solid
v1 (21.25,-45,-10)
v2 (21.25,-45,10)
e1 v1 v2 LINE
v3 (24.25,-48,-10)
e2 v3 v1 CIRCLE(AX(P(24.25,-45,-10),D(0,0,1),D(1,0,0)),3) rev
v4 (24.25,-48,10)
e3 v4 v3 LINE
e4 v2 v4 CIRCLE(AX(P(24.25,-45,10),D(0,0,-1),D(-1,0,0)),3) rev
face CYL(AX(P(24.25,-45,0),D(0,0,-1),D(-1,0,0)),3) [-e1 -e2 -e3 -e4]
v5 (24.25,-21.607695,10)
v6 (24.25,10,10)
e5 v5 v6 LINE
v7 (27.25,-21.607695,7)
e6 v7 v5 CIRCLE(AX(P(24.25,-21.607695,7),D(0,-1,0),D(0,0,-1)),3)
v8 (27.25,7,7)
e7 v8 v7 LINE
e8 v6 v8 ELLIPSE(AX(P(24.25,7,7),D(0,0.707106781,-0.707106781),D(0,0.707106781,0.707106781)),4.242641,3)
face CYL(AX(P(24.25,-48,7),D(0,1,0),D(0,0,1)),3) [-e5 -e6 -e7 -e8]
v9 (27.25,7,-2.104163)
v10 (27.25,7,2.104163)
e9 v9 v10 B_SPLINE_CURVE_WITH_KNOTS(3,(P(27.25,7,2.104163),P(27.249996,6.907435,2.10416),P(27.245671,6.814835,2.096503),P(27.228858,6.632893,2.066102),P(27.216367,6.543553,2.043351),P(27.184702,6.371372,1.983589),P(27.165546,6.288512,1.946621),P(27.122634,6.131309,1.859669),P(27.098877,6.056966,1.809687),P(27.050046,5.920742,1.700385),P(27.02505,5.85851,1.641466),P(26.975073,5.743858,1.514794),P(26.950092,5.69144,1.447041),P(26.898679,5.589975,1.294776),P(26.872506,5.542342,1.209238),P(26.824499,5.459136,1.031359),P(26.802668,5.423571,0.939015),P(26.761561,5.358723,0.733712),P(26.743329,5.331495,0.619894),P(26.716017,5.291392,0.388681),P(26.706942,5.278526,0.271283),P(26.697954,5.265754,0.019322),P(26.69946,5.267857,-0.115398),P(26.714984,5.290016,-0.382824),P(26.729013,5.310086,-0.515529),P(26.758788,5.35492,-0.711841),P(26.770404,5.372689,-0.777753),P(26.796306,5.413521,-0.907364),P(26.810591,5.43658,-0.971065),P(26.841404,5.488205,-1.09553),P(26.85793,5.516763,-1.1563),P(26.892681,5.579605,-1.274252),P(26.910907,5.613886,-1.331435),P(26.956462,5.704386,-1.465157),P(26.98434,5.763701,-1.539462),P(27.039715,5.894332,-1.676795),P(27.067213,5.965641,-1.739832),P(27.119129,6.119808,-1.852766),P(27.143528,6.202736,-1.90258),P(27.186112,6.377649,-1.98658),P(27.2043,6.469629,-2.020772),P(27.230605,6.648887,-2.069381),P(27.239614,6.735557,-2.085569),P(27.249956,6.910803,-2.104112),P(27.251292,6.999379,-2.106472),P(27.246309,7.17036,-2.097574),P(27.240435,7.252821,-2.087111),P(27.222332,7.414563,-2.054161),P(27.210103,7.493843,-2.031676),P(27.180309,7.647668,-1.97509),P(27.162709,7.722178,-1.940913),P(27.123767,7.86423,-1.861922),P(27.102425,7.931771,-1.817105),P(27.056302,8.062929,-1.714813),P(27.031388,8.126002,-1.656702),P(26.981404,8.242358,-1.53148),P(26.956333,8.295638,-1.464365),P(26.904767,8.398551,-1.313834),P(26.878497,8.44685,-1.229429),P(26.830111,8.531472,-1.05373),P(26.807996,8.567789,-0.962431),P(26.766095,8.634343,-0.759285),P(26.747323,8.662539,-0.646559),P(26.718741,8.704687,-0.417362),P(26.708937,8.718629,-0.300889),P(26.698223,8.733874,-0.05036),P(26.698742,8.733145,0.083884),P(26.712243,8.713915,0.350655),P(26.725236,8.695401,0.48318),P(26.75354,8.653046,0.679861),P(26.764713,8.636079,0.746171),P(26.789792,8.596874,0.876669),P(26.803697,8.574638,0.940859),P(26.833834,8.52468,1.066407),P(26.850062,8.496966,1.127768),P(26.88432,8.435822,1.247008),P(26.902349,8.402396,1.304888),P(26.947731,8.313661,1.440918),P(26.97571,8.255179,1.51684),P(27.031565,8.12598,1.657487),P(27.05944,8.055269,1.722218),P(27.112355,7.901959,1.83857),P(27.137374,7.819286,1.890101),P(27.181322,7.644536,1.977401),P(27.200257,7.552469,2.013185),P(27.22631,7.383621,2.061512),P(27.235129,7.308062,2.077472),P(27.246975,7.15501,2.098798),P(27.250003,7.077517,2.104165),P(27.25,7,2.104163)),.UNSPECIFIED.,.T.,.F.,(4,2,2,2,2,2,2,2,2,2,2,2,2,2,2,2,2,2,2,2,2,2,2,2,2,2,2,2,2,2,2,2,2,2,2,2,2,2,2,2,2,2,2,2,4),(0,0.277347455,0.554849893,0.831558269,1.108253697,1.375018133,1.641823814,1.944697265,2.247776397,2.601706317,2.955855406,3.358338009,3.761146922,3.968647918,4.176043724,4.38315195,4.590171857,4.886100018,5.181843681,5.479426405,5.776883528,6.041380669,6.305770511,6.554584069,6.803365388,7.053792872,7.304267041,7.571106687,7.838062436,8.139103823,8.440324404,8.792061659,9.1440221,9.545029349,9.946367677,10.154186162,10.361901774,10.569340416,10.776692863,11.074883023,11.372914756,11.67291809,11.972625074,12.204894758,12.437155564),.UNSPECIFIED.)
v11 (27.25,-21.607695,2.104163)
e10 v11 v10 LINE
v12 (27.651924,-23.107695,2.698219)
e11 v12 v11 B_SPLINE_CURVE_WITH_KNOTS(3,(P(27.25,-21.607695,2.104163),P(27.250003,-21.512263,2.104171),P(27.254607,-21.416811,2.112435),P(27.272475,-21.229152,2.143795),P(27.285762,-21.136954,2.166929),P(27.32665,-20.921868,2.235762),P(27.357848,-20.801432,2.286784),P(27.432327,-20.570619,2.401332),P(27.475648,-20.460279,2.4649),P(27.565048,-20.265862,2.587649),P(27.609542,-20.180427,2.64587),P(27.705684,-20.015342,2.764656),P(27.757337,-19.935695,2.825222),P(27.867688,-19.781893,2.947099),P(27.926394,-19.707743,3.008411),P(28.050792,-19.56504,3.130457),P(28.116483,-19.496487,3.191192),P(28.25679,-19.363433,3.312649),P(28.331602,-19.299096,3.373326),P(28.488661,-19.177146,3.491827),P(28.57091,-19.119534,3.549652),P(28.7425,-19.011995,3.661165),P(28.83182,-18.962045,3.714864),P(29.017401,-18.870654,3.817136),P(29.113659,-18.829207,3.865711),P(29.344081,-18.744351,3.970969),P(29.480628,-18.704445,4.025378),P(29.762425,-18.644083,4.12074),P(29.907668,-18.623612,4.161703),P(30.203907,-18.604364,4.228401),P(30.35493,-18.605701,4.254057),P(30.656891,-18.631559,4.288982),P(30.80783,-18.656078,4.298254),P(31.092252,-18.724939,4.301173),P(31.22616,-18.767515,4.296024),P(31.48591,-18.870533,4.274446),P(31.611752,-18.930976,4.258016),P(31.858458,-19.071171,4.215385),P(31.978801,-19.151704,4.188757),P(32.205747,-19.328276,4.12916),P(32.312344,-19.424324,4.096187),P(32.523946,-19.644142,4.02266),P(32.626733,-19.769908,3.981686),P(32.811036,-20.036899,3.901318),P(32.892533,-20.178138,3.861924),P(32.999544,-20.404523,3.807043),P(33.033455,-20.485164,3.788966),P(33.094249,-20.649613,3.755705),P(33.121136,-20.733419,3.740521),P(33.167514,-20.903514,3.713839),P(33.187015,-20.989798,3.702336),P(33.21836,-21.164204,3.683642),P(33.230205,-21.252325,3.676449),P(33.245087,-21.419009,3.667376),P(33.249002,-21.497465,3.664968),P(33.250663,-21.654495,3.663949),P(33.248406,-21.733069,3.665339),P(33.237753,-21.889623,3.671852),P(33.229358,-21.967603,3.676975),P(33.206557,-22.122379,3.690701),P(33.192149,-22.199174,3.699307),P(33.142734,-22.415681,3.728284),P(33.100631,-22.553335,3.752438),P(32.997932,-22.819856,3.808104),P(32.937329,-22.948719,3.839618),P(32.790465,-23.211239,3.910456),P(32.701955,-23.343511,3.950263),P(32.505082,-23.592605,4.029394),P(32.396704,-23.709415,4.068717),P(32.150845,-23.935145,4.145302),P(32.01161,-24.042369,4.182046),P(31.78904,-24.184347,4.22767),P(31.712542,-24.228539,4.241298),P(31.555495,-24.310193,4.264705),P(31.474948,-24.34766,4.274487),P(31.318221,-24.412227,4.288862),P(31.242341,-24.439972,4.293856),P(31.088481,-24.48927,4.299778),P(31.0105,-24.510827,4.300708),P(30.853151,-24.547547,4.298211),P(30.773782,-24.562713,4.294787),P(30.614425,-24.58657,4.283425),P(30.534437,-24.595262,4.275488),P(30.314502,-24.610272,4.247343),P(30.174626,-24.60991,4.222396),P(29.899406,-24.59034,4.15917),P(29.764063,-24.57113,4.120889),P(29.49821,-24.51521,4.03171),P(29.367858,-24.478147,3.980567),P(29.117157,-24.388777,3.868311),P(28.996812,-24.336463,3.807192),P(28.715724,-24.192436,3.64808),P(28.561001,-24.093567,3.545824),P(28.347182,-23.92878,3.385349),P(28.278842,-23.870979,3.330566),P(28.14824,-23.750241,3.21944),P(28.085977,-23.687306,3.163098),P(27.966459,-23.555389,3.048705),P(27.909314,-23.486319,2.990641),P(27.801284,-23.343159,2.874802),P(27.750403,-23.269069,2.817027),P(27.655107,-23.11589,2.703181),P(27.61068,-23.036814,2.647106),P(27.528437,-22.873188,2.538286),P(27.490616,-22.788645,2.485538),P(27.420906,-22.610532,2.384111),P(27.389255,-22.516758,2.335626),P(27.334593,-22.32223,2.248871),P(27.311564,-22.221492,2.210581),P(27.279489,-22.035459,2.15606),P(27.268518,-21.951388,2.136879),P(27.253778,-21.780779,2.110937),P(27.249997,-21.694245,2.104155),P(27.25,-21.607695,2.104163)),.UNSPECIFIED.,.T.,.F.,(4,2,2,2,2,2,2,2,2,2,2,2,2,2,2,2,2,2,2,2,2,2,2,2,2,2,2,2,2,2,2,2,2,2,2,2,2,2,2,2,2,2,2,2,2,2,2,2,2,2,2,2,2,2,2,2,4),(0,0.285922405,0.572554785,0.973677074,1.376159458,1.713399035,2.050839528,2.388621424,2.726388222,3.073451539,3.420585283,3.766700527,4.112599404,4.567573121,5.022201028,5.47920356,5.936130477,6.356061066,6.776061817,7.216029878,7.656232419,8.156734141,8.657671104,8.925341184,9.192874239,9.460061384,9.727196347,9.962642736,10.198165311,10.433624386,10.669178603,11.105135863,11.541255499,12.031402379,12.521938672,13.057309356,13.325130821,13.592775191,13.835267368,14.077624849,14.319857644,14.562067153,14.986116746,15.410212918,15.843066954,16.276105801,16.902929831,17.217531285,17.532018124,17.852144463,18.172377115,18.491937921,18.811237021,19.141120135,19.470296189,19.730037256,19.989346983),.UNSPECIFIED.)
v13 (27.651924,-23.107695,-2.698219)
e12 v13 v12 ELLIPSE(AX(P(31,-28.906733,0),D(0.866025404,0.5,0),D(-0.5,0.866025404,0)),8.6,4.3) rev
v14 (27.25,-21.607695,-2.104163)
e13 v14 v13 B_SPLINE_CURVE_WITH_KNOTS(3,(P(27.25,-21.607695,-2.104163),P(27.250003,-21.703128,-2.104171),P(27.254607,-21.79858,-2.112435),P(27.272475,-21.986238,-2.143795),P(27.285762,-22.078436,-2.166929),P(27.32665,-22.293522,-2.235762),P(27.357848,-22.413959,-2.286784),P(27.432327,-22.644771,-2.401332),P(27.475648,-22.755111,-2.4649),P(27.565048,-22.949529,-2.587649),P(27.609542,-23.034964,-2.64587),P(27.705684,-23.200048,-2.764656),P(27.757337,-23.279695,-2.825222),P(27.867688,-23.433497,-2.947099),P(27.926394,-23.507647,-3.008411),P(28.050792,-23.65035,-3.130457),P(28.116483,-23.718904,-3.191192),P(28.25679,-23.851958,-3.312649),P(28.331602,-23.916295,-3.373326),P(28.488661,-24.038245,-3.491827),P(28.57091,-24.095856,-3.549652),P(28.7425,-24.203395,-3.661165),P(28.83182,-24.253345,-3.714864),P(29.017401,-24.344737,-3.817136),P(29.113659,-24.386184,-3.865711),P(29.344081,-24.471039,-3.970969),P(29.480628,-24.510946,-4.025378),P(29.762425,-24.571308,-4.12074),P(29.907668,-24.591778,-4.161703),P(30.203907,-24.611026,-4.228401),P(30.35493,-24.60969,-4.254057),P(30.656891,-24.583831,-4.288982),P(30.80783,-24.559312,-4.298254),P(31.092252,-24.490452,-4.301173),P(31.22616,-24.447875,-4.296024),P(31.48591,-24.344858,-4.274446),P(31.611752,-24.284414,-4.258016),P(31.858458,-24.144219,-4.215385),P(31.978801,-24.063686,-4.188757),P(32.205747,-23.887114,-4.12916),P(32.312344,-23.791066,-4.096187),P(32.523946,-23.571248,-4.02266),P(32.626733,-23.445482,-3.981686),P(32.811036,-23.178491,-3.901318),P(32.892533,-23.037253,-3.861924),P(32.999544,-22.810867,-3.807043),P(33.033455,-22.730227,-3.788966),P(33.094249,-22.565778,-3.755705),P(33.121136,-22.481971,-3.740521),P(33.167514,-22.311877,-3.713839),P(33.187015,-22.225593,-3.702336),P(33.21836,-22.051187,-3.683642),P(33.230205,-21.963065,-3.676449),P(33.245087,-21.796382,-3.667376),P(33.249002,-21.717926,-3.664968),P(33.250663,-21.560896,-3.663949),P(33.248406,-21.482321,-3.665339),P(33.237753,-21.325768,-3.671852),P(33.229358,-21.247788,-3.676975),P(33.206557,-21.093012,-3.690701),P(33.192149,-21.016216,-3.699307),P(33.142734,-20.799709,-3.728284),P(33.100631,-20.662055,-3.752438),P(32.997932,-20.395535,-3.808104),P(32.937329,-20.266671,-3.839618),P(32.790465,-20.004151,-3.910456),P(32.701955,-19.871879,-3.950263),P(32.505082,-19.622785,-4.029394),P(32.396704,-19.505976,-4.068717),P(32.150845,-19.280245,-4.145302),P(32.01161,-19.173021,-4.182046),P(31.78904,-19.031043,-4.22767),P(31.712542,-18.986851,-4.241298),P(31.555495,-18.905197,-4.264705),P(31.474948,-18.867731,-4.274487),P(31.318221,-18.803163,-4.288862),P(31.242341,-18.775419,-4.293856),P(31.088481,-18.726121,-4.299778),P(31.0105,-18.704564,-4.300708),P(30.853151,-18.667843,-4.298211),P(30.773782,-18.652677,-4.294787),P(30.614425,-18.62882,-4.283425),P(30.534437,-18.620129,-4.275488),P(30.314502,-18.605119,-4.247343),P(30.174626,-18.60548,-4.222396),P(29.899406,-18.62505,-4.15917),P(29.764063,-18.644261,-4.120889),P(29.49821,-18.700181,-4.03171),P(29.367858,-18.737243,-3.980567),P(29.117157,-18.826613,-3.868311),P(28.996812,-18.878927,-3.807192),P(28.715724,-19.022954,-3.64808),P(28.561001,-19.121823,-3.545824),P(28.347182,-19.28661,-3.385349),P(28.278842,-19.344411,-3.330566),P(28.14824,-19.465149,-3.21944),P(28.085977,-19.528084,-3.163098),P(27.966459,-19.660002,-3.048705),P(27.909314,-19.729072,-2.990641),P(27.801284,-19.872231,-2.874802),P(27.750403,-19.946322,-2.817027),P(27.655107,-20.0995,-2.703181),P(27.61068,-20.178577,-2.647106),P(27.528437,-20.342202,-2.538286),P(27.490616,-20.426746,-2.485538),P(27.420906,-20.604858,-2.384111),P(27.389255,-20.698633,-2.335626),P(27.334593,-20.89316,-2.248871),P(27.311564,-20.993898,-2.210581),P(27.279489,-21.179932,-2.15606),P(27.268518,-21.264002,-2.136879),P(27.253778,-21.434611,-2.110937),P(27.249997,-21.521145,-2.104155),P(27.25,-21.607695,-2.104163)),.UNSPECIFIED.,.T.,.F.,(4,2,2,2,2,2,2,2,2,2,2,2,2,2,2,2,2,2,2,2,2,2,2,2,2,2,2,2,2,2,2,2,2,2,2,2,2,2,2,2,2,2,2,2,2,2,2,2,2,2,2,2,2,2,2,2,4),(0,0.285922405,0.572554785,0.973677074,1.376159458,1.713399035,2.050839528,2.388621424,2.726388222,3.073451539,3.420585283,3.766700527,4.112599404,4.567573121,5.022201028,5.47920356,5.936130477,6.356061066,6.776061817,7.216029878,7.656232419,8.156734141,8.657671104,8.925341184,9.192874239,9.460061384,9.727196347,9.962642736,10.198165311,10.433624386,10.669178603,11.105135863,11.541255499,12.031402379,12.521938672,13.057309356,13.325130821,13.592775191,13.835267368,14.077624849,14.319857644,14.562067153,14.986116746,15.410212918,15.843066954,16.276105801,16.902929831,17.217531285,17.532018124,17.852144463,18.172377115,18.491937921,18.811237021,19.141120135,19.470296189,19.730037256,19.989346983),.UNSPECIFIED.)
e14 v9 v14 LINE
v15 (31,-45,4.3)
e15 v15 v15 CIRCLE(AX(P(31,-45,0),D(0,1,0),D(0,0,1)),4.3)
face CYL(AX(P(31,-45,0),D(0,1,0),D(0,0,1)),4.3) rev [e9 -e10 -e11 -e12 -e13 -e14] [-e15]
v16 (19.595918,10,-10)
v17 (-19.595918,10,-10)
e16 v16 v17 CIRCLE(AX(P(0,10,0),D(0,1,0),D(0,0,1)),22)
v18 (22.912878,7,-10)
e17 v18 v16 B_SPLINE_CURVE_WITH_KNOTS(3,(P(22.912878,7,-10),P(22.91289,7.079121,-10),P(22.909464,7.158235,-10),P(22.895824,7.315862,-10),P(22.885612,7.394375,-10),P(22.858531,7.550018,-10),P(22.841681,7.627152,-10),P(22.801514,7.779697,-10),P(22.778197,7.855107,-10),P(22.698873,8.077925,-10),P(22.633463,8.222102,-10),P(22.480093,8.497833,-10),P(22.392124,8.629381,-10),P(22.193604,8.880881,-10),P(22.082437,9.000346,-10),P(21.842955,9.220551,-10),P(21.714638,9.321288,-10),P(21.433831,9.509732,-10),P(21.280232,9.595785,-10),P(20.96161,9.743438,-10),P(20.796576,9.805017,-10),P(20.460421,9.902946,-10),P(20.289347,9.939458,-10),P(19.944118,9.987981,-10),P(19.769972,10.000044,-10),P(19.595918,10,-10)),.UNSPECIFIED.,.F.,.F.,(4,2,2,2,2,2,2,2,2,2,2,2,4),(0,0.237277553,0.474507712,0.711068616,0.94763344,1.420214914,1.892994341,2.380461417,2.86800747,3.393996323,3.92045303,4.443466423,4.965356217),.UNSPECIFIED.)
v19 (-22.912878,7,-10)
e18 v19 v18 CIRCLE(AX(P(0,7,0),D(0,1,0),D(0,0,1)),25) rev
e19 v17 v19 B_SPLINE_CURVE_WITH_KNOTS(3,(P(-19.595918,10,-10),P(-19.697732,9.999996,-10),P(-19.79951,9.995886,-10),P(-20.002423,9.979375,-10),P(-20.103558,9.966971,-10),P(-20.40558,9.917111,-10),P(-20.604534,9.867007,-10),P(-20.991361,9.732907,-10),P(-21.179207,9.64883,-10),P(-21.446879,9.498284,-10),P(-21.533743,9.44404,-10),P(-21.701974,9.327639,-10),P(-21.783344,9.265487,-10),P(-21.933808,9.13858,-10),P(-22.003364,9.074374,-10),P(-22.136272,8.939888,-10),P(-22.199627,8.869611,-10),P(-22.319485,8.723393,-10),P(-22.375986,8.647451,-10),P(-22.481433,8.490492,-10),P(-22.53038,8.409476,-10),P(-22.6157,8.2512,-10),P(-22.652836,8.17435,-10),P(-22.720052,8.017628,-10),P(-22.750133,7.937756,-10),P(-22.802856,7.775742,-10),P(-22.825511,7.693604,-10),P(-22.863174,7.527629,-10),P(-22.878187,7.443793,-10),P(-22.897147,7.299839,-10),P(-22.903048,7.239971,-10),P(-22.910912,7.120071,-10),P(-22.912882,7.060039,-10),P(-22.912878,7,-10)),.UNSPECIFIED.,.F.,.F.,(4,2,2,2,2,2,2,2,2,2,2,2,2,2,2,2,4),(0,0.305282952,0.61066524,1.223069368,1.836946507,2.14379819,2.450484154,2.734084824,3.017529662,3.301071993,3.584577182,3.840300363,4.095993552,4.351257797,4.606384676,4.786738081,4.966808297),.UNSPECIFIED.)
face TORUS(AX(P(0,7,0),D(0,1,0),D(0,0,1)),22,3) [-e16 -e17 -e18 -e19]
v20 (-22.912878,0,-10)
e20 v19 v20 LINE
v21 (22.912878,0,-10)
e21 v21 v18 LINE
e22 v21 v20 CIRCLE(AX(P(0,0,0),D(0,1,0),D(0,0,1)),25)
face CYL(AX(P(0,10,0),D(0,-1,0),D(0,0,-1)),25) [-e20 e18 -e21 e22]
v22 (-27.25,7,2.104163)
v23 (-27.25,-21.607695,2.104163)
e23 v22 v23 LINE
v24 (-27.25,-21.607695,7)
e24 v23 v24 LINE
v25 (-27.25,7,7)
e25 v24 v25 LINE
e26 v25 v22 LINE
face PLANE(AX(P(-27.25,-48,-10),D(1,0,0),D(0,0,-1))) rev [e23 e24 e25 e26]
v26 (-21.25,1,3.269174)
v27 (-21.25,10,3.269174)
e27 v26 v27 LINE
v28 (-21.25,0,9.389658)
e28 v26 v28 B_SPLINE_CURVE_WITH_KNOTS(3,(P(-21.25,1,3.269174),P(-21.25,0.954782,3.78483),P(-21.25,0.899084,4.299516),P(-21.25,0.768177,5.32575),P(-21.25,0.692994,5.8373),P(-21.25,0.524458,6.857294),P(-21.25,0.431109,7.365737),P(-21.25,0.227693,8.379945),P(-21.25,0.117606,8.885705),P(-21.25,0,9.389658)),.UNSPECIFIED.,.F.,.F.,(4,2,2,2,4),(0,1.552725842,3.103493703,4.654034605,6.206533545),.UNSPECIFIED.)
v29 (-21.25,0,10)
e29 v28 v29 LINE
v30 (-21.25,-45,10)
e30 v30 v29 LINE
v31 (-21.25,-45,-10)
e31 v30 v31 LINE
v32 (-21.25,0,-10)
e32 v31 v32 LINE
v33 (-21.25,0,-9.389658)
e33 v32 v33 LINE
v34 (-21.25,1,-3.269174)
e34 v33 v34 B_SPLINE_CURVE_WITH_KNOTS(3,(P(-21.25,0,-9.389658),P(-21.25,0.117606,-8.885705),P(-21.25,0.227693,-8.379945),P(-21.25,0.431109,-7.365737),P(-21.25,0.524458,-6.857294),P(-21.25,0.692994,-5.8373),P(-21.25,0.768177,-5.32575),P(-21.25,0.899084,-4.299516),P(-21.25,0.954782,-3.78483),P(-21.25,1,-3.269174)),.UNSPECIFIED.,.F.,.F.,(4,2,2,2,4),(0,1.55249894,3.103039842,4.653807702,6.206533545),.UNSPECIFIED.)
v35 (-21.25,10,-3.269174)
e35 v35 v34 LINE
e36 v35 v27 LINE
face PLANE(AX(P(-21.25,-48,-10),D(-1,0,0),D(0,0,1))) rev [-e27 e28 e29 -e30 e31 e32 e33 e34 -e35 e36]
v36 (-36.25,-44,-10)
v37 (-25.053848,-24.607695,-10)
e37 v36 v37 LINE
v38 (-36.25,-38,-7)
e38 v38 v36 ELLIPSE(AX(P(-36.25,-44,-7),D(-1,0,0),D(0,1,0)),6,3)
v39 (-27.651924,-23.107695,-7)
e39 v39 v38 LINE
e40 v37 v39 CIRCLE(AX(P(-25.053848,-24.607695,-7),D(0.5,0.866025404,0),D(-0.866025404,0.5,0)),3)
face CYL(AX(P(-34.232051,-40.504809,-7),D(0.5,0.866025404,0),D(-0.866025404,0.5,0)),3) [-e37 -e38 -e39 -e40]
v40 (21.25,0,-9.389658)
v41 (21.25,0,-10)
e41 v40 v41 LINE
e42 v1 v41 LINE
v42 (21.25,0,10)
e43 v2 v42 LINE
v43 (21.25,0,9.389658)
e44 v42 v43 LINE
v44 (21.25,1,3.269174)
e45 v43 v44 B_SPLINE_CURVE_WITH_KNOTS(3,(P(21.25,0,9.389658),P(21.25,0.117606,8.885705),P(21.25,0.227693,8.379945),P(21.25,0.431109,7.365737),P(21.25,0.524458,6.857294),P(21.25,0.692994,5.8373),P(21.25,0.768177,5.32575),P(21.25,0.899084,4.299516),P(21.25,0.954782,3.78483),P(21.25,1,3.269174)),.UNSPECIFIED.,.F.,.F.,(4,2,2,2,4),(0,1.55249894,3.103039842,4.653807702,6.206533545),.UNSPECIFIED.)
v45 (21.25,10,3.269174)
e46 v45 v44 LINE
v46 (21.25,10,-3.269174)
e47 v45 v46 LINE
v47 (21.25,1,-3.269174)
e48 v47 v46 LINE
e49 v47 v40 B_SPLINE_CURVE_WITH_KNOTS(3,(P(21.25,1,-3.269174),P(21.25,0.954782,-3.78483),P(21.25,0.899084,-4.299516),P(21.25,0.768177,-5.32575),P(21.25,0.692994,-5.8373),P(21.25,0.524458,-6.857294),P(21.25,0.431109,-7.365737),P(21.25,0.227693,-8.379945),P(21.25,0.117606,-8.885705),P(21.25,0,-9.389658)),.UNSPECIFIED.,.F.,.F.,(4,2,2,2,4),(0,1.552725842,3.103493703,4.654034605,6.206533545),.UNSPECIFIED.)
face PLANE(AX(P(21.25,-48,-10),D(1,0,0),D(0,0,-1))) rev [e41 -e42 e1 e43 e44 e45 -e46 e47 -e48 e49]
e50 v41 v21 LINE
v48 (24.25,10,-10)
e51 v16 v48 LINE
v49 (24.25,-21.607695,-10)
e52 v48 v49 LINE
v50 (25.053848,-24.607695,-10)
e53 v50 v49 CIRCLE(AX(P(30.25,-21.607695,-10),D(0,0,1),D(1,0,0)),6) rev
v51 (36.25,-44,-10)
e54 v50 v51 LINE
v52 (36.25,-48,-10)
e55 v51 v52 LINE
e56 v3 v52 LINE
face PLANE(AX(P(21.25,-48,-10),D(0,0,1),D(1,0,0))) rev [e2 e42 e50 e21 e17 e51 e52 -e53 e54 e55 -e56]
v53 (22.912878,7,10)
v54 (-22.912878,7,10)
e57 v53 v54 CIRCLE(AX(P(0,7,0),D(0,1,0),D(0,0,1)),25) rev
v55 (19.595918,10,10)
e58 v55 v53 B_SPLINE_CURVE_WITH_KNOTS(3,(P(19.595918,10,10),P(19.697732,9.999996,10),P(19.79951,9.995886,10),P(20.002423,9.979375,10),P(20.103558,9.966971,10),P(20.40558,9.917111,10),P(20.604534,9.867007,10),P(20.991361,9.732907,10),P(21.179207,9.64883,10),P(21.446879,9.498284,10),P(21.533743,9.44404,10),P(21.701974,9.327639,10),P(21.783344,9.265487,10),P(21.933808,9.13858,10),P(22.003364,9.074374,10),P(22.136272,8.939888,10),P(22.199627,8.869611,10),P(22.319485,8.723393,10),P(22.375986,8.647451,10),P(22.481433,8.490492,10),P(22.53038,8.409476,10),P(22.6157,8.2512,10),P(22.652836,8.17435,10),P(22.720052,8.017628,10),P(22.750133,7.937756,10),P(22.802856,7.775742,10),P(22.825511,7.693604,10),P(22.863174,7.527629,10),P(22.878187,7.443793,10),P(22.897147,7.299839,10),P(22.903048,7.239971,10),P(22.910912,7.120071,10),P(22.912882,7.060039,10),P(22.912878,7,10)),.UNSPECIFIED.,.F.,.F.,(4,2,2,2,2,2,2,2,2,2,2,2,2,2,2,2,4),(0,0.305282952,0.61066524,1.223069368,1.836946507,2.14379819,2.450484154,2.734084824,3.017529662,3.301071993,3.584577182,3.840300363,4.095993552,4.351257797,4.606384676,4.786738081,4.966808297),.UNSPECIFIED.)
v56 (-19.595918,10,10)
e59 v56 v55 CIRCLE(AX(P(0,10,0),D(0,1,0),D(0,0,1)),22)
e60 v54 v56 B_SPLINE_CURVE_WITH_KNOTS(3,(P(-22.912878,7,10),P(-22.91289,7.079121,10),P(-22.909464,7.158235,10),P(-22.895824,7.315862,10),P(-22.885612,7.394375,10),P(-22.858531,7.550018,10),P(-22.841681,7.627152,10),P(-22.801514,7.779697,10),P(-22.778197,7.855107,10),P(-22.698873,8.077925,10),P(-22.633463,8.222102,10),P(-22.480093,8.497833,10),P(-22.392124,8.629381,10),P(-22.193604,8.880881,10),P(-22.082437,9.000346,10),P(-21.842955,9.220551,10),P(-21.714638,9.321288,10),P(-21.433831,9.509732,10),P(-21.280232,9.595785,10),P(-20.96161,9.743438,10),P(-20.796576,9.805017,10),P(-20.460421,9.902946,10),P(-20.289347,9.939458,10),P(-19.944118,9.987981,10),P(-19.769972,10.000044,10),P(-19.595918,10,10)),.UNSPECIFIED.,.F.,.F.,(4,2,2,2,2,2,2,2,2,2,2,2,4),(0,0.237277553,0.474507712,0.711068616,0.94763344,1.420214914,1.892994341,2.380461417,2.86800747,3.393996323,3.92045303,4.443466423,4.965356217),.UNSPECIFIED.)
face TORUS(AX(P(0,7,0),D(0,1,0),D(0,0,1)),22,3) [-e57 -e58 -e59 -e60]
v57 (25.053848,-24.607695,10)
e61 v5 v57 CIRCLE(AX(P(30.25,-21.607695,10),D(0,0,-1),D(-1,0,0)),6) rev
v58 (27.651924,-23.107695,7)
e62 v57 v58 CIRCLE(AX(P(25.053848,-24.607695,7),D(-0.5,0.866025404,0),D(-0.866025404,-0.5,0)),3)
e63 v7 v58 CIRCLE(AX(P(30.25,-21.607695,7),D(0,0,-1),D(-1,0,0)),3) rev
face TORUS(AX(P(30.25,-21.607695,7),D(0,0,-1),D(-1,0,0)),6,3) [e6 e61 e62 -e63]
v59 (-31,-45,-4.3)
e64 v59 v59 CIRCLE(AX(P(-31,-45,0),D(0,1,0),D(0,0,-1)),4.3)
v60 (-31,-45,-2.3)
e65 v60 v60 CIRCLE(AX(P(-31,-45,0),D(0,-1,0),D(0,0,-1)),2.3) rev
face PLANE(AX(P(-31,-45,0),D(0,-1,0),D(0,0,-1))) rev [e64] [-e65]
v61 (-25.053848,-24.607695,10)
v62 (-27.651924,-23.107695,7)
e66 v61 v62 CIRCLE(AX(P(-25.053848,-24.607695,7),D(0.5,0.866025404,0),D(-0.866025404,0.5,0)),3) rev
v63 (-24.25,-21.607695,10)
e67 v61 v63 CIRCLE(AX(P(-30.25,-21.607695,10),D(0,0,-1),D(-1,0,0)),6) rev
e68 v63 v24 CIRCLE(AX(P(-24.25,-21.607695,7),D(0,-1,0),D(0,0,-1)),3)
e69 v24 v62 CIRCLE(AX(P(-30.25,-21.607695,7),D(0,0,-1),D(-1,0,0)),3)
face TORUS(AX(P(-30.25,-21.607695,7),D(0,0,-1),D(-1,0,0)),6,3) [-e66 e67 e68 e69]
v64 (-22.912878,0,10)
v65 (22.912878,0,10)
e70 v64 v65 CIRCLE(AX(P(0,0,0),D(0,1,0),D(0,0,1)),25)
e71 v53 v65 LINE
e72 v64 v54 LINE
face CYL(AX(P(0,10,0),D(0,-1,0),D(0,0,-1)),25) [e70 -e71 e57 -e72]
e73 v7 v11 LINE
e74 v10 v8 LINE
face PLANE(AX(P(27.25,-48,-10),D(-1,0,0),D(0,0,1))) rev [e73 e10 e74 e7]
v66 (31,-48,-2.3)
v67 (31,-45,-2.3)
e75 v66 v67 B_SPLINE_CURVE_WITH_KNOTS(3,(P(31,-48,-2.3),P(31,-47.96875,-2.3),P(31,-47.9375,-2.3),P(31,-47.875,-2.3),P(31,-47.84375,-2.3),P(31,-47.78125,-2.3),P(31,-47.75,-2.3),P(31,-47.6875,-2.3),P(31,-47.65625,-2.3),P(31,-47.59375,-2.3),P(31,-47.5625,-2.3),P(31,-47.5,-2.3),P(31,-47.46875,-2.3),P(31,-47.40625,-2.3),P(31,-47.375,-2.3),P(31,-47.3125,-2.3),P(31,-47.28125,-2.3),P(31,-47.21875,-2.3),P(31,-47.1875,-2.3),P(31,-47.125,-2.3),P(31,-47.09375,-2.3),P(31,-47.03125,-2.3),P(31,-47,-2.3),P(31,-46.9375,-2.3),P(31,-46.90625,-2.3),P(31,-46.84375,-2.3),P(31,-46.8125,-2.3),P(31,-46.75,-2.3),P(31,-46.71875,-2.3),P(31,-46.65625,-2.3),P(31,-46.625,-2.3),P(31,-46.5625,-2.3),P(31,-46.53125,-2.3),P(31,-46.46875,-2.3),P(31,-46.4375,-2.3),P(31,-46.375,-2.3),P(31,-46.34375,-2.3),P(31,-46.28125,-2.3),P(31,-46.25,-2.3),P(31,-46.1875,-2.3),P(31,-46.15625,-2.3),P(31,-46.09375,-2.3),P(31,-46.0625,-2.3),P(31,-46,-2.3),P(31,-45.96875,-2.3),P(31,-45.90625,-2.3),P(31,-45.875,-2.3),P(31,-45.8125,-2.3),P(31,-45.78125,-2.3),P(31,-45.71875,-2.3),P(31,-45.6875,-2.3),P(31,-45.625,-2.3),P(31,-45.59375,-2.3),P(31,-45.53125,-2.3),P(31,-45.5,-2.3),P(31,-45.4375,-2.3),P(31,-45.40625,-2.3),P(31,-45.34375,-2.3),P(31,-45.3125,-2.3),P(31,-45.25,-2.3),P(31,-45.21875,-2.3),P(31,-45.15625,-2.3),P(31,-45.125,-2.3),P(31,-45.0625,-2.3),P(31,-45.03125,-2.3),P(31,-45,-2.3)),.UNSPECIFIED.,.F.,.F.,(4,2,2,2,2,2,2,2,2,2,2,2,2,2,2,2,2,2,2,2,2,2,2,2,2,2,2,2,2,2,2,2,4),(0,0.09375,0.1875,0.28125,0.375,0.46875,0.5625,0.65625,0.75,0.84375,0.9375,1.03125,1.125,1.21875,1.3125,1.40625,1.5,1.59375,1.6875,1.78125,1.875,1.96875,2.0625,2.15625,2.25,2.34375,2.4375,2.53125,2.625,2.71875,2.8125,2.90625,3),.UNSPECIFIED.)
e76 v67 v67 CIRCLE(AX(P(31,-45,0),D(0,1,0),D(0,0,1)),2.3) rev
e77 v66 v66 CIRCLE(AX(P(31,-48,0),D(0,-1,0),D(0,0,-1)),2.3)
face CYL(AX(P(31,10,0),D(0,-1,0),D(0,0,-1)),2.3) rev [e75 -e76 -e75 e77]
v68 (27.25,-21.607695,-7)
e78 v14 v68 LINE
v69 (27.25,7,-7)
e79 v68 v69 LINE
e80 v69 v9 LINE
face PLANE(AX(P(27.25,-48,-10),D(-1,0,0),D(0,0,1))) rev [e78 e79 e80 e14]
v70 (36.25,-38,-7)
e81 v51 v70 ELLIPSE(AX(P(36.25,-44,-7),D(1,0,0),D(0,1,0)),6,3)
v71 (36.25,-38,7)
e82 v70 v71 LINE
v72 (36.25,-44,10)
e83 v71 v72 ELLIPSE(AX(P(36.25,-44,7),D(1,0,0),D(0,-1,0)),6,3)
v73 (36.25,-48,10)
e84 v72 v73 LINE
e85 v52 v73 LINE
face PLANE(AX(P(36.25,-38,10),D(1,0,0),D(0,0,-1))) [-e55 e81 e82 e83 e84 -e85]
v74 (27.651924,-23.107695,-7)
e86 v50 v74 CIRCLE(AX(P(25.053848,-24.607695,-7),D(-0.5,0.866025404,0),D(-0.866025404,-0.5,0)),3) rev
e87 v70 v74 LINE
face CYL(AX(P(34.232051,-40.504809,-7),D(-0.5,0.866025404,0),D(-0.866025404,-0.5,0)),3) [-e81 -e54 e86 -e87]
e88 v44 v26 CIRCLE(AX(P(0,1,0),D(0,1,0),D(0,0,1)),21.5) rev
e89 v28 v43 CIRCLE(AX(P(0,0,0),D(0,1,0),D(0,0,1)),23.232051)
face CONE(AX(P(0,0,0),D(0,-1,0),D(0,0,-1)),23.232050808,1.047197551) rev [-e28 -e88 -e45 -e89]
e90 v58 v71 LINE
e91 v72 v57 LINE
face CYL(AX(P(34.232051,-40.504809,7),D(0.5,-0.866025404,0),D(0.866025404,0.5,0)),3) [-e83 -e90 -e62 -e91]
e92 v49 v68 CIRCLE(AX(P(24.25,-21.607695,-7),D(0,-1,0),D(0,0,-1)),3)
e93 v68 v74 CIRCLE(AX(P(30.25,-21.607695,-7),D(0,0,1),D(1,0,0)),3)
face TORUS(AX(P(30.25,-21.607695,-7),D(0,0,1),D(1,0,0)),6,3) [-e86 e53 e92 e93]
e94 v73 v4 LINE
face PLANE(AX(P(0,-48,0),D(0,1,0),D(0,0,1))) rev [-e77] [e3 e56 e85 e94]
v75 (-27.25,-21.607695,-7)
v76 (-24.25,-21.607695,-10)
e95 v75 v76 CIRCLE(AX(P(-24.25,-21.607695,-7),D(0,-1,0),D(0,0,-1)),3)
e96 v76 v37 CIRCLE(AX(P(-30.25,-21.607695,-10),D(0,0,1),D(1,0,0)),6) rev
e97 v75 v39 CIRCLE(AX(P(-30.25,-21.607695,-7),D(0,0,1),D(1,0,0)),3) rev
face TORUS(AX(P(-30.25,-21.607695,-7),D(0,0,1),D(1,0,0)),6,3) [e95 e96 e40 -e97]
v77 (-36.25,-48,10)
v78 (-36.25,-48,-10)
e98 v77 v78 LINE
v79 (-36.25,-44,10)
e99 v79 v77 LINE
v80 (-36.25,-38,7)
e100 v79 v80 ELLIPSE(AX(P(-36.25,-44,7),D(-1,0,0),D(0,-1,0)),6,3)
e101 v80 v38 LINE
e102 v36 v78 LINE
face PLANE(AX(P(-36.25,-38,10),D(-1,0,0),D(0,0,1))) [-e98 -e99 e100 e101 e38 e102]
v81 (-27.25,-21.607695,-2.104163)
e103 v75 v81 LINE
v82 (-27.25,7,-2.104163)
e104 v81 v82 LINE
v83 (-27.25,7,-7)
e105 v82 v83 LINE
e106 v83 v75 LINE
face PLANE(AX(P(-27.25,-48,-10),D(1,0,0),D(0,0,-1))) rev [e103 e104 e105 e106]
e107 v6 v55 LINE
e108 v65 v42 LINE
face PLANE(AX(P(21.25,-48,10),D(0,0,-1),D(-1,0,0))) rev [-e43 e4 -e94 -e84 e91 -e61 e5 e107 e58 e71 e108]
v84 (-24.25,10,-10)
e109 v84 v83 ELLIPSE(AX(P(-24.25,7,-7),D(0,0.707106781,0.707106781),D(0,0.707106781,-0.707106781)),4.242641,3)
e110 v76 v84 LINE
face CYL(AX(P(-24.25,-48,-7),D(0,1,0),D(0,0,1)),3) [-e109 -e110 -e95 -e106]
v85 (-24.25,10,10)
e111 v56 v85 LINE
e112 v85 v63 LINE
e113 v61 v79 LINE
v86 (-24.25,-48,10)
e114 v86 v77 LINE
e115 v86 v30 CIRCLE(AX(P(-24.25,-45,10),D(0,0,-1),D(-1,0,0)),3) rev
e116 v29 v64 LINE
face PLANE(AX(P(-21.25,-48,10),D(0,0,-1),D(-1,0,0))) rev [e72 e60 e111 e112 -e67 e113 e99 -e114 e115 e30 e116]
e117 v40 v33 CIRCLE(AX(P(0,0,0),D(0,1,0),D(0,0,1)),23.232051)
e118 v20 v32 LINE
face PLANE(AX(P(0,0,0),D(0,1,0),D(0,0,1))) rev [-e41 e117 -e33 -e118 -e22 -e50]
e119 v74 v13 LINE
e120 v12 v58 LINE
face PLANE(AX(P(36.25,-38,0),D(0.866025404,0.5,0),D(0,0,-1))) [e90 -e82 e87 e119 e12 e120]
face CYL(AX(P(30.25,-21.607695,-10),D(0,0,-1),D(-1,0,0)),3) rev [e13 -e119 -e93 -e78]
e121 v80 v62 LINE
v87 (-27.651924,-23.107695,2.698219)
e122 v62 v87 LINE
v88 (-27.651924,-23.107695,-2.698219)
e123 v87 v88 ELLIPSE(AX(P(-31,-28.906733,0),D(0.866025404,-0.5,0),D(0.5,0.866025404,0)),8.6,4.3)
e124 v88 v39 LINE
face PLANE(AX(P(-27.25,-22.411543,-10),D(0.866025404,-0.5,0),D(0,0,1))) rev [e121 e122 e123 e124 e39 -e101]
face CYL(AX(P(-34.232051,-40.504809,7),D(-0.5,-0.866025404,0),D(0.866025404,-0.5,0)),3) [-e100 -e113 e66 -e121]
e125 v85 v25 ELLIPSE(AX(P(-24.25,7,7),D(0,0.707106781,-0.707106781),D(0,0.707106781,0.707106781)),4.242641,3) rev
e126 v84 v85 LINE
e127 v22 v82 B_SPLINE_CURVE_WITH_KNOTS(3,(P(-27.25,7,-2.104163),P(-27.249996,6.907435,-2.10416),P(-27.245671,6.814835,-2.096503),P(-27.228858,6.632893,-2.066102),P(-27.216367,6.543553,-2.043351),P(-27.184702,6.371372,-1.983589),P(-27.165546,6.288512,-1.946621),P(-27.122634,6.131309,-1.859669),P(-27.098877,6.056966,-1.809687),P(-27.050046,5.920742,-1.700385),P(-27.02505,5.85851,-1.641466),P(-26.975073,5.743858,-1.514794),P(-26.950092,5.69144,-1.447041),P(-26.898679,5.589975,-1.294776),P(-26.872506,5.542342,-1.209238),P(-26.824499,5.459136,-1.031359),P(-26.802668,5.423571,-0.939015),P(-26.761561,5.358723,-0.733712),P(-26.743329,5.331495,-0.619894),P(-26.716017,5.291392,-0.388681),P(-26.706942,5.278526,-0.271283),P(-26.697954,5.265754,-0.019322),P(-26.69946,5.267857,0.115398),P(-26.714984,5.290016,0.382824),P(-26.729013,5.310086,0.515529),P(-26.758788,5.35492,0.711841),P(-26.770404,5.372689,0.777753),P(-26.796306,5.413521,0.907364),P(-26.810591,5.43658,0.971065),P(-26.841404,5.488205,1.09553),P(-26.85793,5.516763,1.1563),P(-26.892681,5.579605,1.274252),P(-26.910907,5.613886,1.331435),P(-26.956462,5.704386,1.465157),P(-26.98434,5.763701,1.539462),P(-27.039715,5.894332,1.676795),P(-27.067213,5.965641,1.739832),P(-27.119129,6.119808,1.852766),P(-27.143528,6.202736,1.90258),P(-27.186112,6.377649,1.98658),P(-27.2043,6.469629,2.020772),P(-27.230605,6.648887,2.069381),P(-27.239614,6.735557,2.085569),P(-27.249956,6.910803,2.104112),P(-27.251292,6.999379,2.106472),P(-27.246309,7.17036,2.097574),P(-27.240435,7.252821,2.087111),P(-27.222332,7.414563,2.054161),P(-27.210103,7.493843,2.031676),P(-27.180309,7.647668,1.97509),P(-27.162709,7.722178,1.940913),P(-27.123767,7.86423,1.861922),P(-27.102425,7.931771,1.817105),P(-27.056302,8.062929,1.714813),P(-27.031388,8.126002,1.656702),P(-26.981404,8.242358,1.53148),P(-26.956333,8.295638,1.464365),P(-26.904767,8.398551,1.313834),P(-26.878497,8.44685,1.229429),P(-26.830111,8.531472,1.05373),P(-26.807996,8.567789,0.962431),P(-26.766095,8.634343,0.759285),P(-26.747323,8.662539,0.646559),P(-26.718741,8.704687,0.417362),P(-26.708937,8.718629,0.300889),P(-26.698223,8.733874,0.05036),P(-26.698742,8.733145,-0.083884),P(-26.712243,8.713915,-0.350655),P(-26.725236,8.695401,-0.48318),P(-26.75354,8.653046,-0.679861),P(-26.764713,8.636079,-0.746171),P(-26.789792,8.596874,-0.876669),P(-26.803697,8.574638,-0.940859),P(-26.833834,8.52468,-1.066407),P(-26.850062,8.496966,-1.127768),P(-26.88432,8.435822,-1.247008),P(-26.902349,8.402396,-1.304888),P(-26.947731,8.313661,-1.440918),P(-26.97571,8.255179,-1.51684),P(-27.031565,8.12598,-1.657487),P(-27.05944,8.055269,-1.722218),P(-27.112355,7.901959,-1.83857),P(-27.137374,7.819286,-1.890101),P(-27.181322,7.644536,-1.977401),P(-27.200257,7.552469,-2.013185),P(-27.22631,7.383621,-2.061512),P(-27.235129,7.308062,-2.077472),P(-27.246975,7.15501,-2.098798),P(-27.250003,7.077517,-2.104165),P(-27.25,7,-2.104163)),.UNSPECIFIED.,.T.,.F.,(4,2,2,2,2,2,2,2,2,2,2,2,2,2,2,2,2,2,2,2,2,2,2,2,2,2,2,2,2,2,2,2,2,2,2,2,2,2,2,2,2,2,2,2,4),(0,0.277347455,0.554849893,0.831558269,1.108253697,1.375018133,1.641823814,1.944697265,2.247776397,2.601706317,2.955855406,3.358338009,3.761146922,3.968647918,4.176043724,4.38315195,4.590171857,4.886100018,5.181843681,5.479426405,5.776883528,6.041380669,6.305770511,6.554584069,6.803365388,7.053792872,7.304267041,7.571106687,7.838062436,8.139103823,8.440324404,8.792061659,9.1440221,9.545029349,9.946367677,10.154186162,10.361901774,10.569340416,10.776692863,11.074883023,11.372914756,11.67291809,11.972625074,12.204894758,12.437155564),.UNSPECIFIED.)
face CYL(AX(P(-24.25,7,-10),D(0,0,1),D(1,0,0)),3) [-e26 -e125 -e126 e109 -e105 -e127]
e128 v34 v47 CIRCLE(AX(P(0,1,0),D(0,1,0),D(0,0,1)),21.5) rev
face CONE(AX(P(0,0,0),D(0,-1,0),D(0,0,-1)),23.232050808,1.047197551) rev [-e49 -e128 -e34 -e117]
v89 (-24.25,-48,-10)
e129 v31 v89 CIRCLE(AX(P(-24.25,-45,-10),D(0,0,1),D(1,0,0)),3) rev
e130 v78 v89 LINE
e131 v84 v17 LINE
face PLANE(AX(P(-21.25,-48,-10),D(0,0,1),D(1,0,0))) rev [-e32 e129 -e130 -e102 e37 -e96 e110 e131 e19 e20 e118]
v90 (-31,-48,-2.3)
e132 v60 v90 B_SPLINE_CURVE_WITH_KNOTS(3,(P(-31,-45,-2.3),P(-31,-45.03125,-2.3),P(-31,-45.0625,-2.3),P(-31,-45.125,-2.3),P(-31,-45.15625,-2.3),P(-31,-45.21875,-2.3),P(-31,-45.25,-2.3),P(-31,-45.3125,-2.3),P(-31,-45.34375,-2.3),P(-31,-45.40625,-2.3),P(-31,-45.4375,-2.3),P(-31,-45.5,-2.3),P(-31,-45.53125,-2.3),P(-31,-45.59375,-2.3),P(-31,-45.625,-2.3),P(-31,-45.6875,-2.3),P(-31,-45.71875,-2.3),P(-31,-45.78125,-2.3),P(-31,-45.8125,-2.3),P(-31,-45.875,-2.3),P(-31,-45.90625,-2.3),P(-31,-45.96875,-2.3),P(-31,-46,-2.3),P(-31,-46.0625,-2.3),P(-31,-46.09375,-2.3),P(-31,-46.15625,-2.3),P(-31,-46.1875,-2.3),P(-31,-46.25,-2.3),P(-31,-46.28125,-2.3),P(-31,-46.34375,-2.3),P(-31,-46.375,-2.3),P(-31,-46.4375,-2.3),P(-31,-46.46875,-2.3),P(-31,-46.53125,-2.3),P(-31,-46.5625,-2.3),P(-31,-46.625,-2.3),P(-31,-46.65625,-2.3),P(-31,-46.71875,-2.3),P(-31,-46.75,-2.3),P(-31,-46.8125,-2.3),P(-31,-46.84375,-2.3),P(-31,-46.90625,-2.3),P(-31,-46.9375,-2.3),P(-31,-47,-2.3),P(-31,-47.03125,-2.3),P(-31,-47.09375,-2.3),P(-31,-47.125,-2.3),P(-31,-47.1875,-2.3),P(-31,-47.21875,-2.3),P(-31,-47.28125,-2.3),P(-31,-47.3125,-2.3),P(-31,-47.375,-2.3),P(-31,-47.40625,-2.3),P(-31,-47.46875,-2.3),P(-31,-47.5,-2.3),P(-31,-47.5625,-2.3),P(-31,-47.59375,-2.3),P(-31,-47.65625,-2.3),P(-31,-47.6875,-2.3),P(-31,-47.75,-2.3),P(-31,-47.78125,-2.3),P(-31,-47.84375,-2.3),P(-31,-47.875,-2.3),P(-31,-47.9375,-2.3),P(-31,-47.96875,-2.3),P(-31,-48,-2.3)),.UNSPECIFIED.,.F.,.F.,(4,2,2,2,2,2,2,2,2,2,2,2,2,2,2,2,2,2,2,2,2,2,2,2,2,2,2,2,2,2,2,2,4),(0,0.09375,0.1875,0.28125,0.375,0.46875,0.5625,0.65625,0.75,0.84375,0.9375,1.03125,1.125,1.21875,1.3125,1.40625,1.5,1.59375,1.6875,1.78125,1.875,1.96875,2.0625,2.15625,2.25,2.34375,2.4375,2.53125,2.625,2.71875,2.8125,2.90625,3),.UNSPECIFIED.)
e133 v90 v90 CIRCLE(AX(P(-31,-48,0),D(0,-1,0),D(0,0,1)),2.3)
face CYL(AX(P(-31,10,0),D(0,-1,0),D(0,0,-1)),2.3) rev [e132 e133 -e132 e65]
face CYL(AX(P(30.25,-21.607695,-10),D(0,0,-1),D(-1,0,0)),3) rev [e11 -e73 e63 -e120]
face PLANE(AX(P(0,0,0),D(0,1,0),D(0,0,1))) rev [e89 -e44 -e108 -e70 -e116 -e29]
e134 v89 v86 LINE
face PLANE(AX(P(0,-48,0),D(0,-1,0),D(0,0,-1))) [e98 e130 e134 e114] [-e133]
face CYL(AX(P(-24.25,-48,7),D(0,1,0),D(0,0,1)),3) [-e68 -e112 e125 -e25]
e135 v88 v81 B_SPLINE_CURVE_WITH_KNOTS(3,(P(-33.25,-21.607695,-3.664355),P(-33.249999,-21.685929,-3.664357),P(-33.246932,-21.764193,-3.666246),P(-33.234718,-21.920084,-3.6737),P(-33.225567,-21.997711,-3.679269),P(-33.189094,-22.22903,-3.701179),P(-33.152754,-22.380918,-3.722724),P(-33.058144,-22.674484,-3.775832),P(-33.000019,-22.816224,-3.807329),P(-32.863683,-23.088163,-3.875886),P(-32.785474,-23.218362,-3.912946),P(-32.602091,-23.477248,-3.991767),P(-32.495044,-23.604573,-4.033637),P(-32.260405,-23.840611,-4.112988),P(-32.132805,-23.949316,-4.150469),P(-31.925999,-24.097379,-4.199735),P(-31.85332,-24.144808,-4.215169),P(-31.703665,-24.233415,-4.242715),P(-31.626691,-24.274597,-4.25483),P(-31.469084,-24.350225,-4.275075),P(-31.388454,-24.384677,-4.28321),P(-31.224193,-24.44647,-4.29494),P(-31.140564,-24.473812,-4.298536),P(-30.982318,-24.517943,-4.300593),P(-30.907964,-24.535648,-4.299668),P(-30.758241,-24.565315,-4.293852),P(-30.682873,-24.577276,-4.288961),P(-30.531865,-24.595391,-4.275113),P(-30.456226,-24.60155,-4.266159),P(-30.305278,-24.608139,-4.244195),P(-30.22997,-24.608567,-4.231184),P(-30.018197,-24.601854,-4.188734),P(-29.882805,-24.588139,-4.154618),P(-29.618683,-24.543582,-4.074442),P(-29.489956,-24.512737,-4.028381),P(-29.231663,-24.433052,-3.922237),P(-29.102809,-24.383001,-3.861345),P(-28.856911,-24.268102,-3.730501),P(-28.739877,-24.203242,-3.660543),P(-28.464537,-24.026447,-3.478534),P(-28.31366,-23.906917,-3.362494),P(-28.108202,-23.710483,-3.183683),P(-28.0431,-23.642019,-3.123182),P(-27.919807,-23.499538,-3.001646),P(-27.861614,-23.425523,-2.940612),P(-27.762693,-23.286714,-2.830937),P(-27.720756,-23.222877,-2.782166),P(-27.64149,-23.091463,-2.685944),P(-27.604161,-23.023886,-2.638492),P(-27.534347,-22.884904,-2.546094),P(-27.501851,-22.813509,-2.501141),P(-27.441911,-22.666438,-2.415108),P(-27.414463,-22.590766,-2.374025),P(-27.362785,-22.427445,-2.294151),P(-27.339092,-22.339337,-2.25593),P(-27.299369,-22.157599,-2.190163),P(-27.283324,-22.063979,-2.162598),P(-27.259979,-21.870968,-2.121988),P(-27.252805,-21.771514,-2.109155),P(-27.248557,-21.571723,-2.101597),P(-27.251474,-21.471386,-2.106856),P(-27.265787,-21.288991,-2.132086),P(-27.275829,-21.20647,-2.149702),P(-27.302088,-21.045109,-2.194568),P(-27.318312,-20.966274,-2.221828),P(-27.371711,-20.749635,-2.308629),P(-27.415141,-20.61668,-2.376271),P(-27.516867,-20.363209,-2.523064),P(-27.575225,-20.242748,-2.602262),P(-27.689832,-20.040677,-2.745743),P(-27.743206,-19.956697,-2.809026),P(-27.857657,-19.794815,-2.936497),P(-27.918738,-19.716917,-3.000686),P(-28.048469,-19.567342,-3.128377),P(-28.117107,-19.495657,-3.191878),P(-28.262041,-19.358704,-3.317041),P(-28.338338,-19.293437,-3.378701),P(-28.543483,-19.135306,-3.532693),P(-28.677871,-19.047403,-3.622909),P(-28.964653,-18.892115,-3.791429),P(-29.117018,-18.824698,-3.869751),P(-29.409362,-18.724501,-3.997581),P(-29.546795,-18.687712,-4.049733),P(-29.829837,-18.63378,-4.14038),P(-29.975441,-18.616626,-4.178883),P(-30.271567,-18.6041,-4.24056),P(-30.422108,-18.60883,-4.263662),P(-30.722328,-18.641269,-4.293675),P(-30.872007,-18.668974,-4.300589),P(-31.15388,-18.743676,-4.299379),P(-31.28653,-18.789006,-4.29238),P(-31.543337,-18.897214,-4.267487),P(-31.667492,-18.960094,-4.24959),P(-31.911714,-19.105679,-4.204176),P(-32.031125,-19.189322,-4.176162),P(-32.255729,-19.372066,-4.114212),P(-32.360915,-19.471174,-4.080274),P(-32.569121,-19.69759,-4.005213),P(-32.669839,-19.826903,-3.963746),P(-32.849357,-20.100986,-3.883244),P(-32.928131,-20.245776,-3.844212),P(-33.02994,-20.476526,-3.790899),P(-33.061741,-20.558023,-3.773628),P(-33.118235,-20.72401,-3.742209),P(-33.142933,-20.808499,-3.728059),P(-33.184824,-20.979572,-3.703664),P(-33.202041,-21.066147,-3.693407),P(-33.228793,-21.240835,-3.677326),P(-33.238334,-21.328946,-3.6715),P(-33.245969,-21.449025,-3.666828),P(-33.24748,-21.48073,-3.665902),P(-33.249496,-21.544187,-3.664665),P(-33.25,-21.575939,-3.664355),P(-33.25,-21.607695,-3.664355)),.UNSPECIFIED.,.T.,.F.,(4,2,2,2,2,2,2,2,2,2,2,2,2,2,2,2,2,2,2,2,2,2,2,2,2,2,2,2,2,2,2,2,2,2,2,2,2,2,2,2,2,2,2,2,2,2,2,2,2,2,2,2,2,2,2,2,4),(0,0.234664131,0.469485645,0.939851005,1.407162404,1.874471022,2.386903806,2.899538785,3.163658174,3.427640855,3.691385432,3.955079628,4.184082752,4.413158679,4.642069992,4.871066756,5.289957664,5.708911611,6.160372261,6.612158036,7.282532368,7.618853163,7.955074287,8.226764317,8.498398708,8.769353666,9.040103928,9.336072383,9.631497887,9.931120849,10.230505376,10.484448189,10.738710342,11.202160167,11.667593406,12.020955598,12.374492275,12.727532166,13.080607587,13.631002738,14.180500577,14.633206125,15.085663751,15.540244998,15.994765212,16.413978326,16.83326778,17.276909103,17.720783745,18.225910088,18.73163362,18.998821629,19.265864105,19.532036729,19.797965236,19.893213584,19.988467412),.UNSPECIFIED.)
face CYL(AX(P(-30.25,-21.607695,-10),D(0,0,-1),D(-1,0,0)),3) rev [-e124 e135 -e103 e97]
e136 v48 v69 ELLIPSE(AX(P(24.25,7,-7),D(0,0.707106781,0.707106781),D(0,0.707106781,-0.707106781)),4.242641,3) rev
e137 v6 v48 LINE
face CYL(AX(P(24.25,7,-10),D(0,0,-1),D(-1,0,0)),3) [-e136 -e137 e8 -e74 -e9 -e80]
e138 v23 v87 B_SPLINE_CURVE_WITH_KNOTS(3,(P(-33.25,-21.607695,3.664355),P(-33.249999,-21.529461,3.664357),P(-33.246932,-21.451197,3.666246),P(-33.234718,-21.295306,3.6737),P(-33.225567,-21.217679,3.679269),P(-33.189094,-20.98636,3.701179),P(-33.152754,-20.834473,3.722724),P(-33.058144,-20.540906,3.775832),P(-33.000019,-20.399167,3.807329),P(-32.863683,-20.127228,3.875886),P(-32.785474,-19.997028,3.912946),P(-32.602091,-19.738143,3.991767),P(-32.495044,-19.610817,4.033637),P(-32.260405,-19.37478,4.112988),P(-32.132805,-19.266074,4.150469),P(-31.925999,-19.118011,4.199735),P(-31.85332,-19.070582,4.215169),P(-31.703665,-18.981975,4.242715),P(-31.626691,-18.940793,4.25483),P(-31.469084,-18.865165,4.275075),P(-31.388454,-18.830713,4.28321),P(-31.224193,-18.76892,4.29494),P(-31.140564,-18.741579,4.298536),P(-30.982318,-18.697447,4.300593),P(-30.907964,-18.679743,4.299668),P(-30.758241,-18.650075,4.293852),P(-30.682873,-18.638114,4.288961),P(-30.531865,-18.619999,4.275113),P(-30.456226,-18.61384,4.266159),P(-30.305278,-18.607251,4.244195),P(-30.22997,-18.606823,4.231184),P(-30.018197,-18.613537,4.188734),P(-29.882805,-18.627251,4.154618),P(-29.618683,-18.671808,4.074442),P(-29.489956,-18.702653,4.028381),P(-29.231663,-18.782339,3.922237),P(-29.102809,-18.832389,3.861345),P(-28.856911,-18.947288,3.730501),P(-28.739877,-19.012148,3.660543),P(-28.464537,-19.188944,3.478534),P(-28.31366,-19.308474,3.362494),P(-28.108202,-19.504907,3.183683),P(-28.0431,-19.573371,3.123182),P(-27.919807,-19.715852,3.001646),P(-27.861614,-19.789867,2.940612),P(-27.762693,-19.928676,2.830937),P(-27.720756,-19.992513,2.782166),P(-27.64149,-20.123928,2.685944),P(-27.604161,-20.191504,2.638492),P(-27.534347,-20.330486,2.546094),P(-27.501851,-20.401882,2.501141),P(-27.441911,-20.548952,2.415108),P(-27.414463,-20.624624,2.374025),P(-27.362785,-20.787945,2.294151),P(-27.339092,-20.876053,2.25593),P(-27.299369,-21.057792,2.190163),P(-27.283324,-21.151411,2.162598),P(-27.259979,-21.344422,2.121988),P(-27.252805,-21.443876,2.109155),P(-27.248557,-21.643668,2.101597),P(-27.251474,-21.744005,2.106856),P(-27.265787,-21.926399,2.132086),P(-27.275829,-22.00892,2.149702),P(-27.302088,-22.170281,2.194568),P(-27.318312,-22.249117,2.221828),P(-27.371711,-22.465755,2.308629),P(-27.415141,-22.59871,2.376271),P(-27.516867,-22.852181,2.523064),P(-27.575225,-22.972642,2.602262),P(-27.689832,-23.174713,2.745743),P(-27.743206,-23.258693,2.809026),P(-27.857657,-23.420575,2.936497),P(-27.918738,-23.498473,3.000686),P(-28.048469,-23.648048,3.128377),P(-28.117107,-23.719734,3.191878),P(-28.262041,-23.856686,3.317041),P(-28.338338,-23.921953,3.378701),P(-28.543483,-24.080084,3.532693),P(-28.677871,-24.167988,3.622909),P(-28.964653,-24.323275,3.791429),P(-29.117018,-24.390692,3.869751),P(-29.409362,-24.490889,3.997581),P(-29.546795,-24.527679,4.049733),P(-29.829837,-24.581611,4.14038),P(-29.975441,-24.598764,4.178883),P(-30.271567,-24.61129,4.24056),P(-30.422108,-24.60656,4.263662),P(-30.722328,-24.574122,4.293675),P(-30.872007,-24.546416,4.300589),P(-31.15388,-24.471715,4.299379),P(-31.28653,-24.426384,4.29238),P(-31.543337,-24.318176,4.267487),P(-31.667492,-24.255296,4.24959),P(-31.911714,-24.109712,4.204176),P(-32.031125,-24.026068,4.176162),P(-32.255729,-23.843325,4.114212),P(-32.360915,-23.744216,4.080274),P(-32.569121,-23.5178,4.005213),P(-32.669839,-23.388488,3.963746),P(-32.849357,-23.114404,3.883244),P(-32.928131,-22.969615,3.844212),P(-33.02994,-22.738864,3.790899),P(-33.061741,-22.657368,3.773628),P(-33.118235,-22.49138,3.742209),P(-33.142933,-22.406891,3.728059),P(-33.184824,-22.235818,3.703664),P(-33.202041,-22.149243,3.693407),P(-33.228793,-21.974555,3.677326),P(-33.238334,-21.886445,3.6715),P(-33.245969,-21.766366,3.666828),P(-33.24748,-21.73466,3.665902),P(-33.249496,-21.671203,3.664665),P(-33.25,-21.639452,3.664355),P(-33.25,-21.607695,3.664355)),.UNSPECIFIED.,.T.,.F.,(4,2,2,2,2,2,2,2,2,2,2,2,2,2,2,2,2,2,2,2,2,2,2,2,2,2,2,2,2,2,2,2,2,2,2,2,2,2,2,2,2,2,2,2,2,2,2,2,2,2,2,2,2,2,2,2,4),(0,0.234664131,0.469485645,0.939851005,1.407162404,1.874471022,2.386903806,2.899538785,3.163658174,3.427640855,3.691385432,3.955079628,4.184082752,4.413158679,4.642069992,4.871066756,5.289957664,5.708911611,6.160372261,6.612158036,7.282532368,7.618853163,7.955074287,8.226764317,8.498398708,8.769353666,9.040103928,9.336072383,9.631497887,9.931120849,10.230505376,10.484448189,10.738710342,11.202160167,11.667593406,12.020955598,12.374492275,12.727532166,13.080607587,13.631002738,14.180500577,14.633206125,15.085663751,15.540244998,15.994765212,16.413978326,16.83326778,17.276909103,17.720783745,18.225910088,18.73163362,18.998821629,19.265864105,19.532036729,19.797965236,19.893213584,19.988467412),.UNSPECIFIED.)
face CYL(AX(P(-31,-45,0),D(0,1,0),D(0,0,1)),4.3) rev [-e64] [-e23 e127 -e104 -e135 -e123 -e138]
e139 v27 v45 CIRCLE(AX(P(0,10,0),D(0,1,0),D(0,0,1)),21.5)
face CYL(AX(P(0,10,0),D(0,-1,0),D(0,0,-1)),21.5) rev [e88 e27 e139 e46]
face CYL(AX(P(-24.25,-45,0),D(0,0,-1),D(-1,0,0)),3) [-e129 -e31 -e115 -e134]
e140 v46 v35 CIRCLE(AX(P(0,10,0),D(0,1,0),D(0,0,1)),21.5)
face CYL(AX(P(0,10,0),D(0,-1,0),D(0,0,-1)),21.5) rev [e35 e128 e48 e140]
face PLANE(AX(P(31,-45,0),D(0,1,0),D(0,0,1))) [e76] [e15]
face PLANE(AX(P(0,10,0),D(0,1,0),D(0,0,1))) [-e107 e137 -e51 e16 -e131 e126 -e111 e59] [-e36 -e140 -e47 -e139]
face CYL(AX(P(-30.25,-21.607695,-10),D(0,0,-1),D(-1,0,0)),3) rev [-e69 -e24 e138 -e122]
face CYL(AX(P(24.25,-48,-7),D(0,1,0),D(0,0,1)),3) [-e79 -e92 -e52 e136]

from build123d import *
from OCP.BRepFilletAPI import BRepFilletAPI_MakeChamfer

# Parameters (mm, degrees)
SKETCH_1_R          = 25
SKETCH_1_R_2        = 21.5
EXTRUDE_1_DEPTH     = 10
SKETCH_2_W          = 6
SKETCH_2_H          = 20
EXTRUDE_2_DEPTH     = 58
SKETCH_3_W          = 15
SKETCH_3_H          = 20
EXTRUDE_3_DEPTH     = 10
SKETCH_4_R          = 2.3
CUT_EXTRUDE_1_DEPTH = 73.822129192
CHAMFER_2_SIZE      = 15.588457268
CHAMFER_2_SIZE_2    = 9
FILLET_1_R          = 3
SKETCH_5_R          = 4.3
CUT_EXTRUDE_2_DEPTH = 55
CHAMFER_3_SIZE      = 1
CHAMFER_3_SIZE2     = 1.732050808


with BuildPart() as part:
    # Sketch 1 → Extrude 1 (new body)
    with BuildSketch(Plane(origin=(0, 0, 0), x_dir=(1, 0, 0), z_dir=(0, 1, 0))):
        with Locations(Location((0, 0, 0), (0, 0, 270))):
            Circle(SKETCH_1_R)
        with Locations(Location((0, 0, 0), (0, 0, 270))):
            Circle(SKETCH_1_R_2, mode=Mode.SUBTRACT)
    extrude(amount=EXTRUDE_1_DEPTH)

    # Sketch 2 → Extrude 2 (add)
    with BuildSketch(Plane(origin=(0, 10, 0), x_dir=(-1, 0, 0), z_dir=(0, -1, 0))):
        with Locations((-24.25, 0)):
            Rectangle(SKETCH_2_W, SKETCH_2_H)
        with Locations((24.25, 0)):
            Rectangle(SKETCH_2_W, SKETCH_2_H)
    extrude(amount=EXTRUDE_2_DEPTH)

    # Sketch 3 → Extrude 3 (add)
    with BuildSketch(Plane.XZ.offset(48)):
        with Locations((28.75, 0)):
            Rectangle(SKETCH_3_W, SKETCH_3_H)
        with Locations((-28.75, 0)):
            Rectangle(SKETCH_3_W, SKETCH_3_H)
    extrude(amount=-EXTRUDE_3_DEPTH)

    # Sketch 4 → Cut-Extrude 1 (cut, through all)
    with BuildSketch(Plane.XZ.offset(48)):
        with Locations(Location((31, 0, 0), (0, 0, 270))):
            Circle(SKETCH_4_R)
        with Locations(Location((-31, 0, 0), (0, 0, 270))):
            Circle(SKETCH_4_R)
    extrude(amount=-CUT_EXTRUDE_1_DEPTH, mode=Mode.SUBTRACT)

    # Chamfer 2
    # the kernel refuses this chamfer: 15.588457268, 9 mm, written as the material it adds along each edge
    with BuildSketch(Plane(origin=(27.25, -38, 10), x_dir=(-0.01932676561270058, 0.9998132206222079, 0), z_dir=(0, 0, -1))) as chamfer_2_piece_1_section:
        Polygon((CHAMFER_2_SIZE * 0.99981322063, CHAMFER_2_SIZE * 0.0193267656128), (-CHAMFER_2_SIZE_2 * 0.0193267656127, CHAMFER_2_SIZE_2 * 0.999813220622), (0, 0), align=None)
    chamfer_2_piece_1 = extrude(amount=20, mode=Mode.PRIVATE)
    chamfer_2_piece_1 = split(chamfer_2_piece_1, bisect_by=Plane(origin=(36.25, -24.615994123, -6.666666667), z_dir=(-1, 0, 0)), keep=Keep.TOP, mode=Mode.PRIVATE)
    chamfer_2_piece_1 = chamfer_2_piece_1 - Plane(origin=(31, -24.615994123, 0), x_dir=(0, 0, -1), z_dir=(0, -1, 0)) * Cylinder(2.3, 103, mode=Mode.PRIVATE)
    add(chamfer_2_piece_1)
    with BuildSketch(Plane(origin=(-27.25, -38, -10), x_dir=(-0.9983227437537927, -0.0578938624026717, 0), z_dir=(0, 0, 1))) as chamfer_2_piece_2_section:
        Polygon((CHAMFER_2_SIZE_2 * 0.998322743754, -CHAMFER_2_SIZE_2 * 0.0578938624027), (-CHAMFER_2_SIZE * 0.0578938624031, -CHAMFER_2_SIZE * 0.998322743761), (0, 0), align=None)
    chamfer_2_piece_2 = extrude(amount=20, mode=Mode.PRIVATE)
    chamfer_2_piece_2 = split(chamfer_2_piece_2, bisect_by=Plane(origin=(-36.25, -35.368298987, 6.666666667), z_dir=(1, 0, 0)), keep=Keep.TOP, mode=Mode.PRIVATE)
    chamfer_2_piece_2 = chamfer_2_piece_2 - Plane(origin=(-31, -35.368298987, 0), x_dir=(0, 0, -1), z_dir=(0, -1, 0)) * Cylinder(2.3, 103, mode=Mode.PRIVATE)
    add(chamfer_2_piece_2)

    # Fillet 1
    fillet_1_edges = [part.edges().sort_by_distance(p)[0] for p in [
        (27.25, -6.205771366, -10),
        (27.25, -6.205771366, 10),
        (27.25, -22.411542732, 0),
        (-27.25, -6.205771366, -10),
        (-27.25, -6.205771366, 10),
        (-27.25, -22.411542732, 0),
        (31.75, -30.205771366, 10),
        (31.75, -30.205771366, -10),
        (-31.75, -30.205771366, 10),
        (-31.75, -30.205771366, -10),
        (0, 10, -25),
        (27.25, 10, 0),
        (21.25, -48, 0),
        (0, 10, 25),
        (-27.25, 10, 0),
        (-21.25, -48, 0),
    ]]
    fillet(fillet_1_edges, radius=FILLET_1_R)

    # Sketch 5 → Cut-Extrude 2 (cut)
    with BuildSketch(Plane(origin=(0, 10, 0), x_dir=(1, 0, 0), z_dir=(0, 1, 0))):
        with Locations(Location((31, 0, 0), (0, 0, 270))):
            Circle(SKETCH_5_R)
        with Locations(Location((-31, 0, 0), (0, 0, 321.134589702))):
            Circle(SKETCH_5_R)
    extrude(amount=-CUT_EXTRUDE_2_DEPTH, mode=Mode.SUBTRACT)

    # Chamfer 3: one chamfer whose edges measure the first distance from different faces: ONE call of the kernel's chamfer builder (chamfer() names one face for all edges)
    chamfer_3_edges_1 = [part.edges().sort_by_distance(p)[0] for p in [
        (0, 0, -21.5),
    ]]
    chamfer_3_side_1 = [part.faces().sort_by_distance(p)[0] for p in [
        (0, 5, -21.5),
    ]]
    chamfer_3_edges_2 = [part.edges().sort_by_distance(p)[0] for p in [
        (0, 0, 21.5),
    ]]
    chamfer_3_side_2 = [part.faces().sort_by_distance(p)[0] for p in [
        (0, 5, 21.5),
    ]]
    chamfer_3 = BRepFilletAPI_MakeChamfer(part.part.solid().wrapped)
    for e in chamfer_3_edges_1:
        chamfer_3.Add(CHAMFER_3_SIZE, CHAMFER_3_SIZE2, e.wrapped, chamfer_3_side_1[0].wrapped)  # the first distance lies on this face
    for e in chamfer_3_edges_2:
        chamfer_3.Add(CHAMFER_3_SIZE, CHAMFER_3_SIZE2, e.wrapped, chamfer_3_side_2[0].wrapped)  # the first distance lies on this face
    add(Compound.cast(chamfer_3.Shape()), mode=Mode.REPLACE)


solid = part.part
